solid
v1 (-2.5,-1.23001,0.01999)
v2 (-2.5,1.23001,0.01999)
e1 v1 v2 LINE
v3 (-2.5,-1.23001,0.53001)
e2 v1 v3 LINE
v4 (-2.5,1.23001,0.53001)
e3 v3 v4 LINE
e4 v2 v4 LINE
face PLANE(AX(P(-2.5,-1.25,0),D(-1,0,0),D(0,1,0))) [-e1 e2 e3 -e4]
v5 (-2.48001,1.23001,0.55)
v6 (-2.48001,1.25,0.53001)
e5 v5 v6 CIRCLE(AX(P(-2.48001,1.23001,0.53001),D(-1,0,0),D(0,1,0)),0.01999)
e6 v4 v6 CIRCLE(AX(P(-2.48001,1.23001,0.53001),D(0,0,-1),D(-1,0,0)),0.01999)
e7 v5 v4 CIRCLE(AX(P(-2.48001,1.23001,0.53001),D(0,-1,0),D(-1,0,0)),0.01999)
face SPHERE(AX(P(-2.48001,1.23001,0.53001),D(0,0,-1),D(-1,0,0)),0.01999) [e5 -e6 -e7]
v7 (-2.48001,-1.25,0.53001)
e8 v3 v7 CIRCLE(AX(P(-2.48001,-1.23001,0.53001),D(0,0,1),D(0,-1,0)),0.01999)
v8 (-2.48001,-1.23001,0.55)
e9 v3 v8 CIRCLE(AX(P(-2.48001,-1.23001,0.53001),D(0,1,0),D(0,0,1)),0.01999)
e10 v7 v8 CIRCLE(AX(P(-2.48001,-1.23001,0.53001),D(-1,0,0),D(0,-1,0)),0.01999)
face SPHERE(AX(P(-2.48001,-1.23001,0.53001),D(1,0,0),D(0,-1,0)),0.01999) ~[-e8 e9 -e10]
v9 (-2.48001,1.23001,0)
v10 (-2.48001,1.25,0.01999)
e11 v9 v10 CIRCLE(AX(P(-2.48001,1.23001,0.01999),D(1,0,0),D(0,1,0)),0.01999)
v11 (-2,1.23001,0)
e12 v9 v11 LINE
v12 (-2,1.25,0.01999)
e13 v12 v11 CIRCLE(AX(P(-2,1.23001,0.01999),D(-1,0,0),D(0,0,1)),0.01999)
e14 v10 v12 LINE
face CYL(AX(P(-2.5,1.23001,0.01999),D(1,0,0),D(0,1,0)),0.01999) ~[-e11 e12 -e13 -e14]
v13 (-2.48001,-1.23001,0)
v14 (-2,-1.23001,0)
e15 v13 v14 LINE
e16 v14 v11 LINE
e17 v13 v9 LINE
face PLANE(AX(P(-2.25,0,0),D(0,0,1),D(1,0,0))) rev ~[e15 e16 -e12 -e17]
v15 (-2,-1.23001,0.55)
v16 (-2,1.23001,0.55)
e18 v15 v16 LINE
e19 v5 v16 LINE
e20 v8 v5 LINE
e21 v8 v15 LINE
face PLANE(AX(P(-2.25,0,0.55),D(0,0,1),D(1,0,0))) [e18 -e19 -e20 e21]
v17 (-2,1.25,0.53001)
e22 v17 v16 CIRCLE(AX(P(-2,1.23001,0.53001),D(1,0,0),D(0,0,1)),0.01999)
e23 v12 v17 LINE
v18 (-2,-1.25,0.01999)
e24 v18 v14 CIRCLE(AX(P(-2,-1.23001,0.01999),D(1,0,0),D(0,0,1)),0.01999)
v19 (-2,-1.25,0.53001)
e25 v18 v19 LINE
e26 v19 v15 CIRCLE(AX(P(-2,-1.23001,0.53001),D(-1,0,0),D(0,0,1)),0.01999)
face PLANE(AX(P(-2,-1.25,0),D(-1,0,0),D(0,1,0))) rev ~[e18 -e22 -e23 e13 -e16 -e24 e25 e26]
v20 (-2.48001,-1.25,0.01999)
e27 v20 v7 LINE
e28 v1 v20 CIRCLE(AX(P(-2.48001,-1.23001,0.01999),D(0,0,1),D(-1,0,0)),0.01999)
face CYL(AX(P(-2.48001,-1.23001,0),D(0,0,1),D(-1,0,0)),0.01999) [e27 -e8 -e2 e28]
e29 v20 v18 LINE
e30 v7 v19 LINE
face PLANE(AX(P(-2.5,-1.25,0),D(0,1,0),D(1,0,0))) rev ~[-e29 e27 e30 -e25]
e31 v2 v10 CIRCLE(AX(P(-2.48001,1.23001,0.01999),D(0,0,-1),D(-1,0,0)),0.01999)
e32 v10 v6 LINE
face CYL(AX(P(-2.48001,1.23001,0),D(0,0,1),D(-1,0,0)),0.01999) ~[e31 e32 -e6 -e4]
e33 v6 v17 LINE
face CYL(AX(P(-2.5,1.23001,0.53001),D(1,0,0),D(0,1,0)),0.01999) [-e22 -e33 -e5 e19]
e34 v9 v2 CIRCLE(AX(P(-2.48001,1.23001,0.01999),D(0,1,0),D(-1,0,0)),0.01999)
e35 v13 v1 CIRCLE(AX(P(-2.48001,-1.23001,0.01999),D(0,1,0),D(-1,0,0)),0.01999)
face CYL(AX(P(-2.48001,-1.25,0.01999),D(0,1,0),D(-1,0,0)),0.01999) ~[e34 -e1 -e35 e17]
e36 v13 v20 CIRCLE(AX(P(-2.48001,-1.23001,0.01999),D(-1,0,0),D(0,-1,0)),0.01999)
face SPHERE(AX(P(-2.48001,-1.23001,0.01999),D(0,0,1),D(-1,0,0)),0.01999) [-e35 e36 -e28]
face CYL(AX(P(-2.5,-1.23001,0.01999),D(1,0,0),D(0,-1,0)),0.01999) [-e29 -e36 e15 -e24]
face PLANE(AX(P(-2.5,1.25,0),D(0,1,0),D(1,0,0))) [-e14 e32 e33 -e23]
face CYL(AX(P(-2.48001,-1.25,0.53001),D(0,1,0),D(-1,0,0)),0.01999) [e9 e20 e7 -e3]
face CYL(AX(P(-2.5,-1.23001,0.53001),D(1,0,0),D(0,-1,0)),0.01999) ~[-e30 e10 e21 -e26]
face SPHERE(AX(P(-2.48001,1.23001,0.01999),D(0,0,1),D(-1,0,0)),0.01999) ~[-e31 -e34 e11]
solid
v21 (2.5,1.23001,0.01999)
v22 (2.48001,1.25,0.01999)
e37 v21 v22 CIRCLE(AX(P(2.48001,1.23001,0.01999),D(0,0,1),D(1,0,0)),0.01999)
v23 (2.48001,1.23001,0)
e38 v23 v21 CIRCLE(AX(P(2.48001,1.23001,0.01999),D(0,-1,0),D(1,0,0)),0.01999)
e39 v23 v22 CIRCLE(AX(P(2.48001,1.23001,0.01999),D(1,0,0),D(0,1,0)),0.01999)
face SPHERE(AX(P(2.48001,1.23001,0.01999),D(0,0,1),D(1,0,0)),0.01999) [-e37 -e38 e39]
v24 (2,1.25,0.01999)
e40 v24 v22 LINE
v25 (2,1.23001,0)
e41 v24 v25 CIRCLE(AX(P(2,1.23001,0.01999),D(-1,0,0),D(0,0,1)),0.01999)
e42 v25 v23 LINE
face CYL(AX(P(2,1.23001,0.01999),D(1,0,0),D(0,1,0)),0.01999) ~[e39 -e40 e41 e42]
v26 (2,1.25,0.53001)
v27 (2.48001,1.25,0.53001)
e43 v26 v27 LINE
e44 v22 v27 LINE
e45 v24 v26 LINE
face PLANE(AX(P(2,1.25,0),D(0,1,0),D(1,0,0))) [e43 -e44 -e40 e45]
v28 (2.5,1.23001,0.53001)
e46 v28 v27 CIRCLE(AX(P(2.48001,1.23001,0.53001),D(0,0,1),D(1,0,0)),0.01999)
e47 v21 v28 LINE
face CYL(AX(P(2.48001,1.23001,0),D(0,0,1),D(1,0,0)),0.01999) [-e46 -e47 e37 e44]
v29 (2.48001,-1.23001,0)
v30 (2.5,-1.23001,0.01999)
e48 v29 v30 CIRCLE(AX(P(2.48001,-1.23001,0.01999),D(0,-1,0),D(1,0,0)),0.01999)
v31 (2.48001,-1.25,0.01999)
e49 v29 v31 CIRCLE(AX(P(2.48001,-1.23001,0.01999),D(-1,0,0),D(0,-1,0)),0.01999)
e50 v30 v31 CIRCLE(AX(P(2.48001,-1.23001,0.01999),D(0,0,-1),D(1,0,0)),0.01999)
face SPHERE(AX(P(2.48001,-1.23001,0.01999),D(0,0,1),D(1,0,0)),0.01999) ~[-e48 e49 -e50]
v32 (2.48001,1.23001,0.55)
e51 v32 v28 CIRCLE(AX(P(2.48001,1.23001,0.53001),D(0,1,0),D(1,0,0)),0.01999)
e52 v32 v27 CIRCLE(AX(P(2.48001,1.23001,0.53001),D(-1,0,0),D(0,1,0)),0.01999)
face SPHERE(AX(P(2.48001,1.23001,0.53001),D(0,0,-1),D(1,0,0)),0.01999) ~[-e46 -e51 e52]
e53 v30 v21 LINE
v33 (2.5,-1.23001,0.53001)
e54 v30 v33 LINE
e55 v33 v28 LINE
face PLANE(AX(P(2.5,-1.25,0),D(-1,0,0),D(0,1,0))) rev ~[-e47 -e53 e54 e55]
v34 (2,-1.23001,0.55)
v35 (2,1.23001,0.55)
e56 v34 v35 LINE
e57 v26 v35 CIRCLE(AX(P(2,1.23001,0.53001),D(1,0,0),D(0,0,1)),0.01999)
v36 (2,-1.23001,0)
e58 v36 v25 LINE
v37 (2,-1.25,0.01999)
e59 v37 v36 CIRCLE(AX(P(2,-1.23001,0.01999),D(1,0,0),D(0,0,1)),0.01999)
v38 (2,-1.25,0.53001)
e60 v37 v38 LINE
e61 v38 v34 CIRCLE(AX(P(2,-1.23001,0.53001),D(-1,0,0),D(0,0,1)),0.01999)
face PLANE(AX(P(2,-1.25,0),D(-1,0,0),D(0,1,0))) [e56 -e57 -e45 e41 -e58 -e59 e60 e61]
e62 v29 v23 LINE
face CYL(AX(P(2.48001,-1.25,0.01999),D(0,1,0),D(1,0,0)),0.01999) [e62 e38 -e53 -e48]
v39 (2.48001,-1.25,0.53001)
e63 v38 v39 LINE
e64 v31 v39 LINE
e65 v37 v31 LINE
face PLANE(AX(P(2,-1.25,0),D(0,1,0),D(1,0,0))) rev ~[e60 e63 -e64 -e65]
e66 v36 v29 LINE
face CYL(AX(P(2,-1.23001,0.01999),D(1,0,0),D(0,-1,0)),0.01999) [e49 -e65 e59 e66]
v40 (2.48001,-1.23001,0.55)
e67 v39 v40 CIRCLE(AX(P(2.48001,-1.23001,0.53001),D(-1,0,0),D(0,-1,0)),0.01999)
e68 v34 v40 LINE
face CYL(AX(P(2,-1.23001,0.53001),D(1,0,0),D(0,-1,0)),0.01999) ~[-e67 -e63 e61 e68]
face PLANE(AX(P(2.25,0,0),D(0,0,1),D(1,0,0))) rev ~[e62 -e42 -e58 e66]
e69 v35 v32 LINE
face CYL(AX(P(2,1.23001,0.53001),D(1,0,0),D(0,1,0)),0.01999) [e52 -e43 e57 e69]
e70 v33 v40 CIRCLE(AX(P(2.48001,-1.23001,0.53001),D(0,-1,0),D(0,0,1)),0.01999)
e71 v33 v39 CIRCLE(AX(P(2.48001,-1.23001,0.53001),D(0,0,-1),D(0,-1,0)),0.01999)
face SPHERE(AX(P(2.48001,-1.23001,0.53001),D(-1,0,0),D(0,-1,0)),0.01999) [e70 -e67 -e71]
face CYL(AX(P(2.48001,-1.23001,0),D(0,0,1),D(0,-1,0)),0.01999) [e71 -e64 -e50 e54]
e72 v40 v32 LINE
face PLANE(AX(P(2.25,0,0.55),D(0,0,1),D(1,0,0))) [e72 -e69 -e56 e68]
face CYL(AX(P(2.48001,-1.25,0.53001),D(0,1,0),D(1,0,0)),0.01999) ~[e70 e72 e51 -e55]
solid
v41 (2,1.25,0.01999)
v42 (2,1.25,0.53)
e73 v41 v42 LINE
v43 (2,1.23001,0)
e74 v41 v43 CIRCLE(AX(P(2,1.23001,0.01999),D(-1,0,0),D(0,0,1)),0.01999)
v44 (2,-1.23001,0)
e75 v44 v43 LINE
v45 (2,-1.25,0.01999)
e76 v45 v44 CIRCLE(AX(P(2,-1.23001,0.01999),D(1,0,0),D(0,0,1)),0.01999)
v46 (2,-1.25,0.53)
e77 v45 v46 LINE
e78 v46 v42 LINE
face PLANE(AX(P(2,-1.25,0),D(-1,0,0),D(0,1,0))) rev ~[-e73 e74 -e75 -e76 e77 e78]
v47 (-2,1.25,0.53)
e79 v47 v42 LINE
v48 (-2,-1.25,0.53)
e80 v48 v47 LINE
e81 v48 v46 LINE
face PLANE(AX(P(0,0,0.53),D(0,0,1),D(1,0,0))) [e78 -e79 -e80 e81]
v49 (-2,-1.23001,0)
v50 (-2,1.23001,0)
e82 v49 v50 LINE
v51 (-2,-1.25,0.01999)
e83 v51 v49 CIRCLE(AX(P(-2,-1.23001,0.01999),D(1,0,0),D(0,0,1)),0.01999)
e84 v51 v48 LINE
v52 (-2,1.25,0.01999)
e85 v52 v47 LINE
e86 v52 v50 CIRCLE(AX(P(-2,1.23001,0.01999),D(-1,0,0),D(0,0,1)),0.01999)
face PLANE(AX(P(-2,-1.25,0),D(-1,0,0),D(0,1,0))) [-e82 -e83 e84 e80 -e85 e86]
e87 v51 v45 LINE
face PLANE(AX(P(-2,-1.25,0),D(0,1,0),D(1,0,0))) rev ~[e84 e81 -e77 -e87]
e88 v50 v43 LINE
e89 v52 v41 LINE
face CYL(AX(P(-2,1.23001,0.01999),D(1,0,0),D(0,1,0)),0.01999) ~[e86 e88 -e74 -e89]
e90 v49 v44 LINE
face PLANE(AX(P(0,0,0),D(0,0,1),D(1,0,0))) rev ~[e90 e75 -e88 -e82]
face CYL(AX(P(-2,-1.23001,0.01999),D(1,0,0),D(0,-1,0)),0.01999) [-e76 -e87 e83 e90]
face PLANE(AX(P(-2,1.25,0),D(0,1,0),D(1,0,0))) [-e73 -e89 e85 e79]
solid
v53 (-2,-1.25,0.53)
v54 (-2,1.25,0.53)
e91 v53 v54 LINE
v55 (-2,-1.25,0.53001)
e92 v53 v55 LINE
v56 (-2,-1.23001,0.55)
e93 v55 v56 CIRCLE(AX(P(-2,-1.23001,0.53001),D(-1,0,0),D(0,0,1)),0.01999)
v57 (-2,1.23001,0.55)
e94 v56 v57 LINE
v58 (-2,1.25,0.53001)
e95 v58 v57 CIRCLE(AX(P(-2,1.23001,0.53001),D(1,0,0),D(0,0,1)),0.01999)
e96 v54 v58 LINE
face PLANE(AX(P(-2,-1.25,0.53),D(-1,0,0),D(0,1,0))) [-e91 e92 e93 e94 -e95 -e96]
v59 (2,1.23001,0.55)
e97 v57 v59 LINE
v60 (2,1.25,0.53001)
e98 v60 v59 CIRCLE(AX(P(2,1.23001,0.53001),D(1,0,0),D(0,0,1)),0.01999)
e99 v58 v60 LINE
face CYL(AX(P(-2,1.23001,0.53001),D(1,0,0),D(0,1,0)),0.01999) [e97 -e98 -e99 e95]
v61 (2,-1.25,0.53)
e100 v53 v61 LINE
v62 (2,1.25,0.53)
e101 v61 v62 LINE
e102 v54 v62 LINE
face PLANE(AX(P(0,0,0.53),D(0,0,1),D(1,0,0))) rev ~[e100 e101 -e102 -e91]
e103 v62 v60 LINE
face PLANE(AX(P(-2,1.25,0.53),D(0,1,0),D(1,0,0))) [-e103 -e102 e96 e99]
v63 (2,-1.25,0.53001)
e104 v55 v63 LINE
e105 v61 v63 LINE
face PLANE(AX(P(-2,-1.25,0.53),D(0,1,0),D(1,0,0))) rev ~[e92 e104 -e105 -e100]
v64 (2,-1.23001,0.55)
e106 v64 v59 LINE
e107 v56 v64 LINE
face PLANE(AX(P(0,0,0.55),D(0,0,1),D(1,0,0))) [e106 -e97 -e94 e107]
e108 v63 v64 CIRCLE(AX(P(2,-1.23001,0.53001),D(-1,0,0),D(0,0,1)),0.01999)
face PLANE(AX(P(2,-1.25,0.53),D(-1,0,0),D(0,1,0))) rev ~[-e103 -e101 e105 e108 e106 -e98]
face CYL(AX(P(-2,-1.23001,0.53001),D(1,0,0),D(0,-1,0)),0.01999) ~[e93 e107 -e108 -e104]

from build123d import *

# Parameters (mm, degrees)
F2_W     = 4
F2_H     = 2.5
F3_DEPTH = 0.53
F2_W_2   = 0.5
F4_DEPTH = 0.55
F5_DEPTH = 0.55
F6_DEPTH = 0.02
F7_R     = 0.01999
F7_2_R   = 0.01999
F7_3_R   = 0.01999
F7_4_R   = 0.01999


# Not quite as in the source:
# - a fillet or chamfer is up to 0.001 mm smaller than in the source, because OpenCascade refuses the exact size


with BuildPart() as f3:
    # F2 (on Top) → F3 (new body)
    with BuildSketch(Plane.XY):
        Rectangle(F2_W, F2_H)
    extrude(amount=F3_DEPTH)


with BuildPart() as f4:
    # F2 (on Top) → F4 (new body)
    with BuildSketch(Plane.XY):
        with Locations((-2.25, 0)):
            Rectangle(F2_W_2, F2_H)
    extrude(amount=F4_DEPTH)

    # F7 (radius 0.02 in the source; OpenCascade refuses exactly that, so slightly less here)
    f7_edges = [f4.edges().sort_by_distance(p)[0] for p in [
        (-2.25, -1.25, 0.55),
        (-2.5, 1.25, 0.275),
        (-2.5, -1.25, 0.275),
        (-2.5, 0, 0),
        (-2.5, 0, 0.55),
        (-2.25, 1.25, 0.55),
        (-2.25, 1.25, 0),
        (-2.25, -1.25, 0),
    ]]
    fillet(f7_edges, radius=F7_R)


with BuildPart() as f5:
    # F2 (on Top) → F5 (new body)
    with BuildSketch(Plane.XY):
        with Locations((2.25, 0)):
            Rectangle(F2_W_2, F2_H)
    extrude(amount=F5_DEPTH)

    # F7#2 (radius 0.02 in the source; OpenCascade refuses exactly that, so slightly less here)
    f7_2_edges = [f5.edges().sort_by_distance(p)[0] for p in [
        (2.25, -1.25, 0.55),
        (2.5, -1.25, 0.275),
        (2.5, 1.25, 0.275),
        (2.5, 0, 0),
        (2.5, 0, 0.55),
        (2.25, 1.25, 0.55),
        (2.25, 1.25, 0),
        (2.25, -1.25, 0),
    ]]
    fillet(f7_2_edges, radius=F7_2_R)


with BuildPart() as f6:
    # F6 (new): a face of the model
    f6_faces = [f3.part.faces().sort_by_distance(p)[0] for p in [
        (0, 0, 0.53),
    ]]
    extrude(f6_faces, amount=F6_DEPTH)

    # F7#4 (radius 0.02 in the source; OpenCascade refuses exactly that, so slightly less here)
    f7_4_edges = [f6.edges().sort_by_distance(p)[0] for p in [
        (0, -1.25, 0.55),
        (0, 1.25, 0.55),
    ]]
    fillet(f7_4_edges, radius=F7_4_R)


with BuildPart() as f3_1:
    add(f3.part)

    # F7#3 (radius 0.02 in the source; OpenCascade refuses exactly that, so slightly less here)
    f7_3_edges = [f3_1.edges().sort_by_distance(p)[0] for p in [
        (0, 1.25, 0),
        (0, -1.25, 0),
    ]]
    fillet(f7_3_edges, radius=F7_3_R)


solid = Compound([f4.part, f5.part, f6.part, f3_1.part])
